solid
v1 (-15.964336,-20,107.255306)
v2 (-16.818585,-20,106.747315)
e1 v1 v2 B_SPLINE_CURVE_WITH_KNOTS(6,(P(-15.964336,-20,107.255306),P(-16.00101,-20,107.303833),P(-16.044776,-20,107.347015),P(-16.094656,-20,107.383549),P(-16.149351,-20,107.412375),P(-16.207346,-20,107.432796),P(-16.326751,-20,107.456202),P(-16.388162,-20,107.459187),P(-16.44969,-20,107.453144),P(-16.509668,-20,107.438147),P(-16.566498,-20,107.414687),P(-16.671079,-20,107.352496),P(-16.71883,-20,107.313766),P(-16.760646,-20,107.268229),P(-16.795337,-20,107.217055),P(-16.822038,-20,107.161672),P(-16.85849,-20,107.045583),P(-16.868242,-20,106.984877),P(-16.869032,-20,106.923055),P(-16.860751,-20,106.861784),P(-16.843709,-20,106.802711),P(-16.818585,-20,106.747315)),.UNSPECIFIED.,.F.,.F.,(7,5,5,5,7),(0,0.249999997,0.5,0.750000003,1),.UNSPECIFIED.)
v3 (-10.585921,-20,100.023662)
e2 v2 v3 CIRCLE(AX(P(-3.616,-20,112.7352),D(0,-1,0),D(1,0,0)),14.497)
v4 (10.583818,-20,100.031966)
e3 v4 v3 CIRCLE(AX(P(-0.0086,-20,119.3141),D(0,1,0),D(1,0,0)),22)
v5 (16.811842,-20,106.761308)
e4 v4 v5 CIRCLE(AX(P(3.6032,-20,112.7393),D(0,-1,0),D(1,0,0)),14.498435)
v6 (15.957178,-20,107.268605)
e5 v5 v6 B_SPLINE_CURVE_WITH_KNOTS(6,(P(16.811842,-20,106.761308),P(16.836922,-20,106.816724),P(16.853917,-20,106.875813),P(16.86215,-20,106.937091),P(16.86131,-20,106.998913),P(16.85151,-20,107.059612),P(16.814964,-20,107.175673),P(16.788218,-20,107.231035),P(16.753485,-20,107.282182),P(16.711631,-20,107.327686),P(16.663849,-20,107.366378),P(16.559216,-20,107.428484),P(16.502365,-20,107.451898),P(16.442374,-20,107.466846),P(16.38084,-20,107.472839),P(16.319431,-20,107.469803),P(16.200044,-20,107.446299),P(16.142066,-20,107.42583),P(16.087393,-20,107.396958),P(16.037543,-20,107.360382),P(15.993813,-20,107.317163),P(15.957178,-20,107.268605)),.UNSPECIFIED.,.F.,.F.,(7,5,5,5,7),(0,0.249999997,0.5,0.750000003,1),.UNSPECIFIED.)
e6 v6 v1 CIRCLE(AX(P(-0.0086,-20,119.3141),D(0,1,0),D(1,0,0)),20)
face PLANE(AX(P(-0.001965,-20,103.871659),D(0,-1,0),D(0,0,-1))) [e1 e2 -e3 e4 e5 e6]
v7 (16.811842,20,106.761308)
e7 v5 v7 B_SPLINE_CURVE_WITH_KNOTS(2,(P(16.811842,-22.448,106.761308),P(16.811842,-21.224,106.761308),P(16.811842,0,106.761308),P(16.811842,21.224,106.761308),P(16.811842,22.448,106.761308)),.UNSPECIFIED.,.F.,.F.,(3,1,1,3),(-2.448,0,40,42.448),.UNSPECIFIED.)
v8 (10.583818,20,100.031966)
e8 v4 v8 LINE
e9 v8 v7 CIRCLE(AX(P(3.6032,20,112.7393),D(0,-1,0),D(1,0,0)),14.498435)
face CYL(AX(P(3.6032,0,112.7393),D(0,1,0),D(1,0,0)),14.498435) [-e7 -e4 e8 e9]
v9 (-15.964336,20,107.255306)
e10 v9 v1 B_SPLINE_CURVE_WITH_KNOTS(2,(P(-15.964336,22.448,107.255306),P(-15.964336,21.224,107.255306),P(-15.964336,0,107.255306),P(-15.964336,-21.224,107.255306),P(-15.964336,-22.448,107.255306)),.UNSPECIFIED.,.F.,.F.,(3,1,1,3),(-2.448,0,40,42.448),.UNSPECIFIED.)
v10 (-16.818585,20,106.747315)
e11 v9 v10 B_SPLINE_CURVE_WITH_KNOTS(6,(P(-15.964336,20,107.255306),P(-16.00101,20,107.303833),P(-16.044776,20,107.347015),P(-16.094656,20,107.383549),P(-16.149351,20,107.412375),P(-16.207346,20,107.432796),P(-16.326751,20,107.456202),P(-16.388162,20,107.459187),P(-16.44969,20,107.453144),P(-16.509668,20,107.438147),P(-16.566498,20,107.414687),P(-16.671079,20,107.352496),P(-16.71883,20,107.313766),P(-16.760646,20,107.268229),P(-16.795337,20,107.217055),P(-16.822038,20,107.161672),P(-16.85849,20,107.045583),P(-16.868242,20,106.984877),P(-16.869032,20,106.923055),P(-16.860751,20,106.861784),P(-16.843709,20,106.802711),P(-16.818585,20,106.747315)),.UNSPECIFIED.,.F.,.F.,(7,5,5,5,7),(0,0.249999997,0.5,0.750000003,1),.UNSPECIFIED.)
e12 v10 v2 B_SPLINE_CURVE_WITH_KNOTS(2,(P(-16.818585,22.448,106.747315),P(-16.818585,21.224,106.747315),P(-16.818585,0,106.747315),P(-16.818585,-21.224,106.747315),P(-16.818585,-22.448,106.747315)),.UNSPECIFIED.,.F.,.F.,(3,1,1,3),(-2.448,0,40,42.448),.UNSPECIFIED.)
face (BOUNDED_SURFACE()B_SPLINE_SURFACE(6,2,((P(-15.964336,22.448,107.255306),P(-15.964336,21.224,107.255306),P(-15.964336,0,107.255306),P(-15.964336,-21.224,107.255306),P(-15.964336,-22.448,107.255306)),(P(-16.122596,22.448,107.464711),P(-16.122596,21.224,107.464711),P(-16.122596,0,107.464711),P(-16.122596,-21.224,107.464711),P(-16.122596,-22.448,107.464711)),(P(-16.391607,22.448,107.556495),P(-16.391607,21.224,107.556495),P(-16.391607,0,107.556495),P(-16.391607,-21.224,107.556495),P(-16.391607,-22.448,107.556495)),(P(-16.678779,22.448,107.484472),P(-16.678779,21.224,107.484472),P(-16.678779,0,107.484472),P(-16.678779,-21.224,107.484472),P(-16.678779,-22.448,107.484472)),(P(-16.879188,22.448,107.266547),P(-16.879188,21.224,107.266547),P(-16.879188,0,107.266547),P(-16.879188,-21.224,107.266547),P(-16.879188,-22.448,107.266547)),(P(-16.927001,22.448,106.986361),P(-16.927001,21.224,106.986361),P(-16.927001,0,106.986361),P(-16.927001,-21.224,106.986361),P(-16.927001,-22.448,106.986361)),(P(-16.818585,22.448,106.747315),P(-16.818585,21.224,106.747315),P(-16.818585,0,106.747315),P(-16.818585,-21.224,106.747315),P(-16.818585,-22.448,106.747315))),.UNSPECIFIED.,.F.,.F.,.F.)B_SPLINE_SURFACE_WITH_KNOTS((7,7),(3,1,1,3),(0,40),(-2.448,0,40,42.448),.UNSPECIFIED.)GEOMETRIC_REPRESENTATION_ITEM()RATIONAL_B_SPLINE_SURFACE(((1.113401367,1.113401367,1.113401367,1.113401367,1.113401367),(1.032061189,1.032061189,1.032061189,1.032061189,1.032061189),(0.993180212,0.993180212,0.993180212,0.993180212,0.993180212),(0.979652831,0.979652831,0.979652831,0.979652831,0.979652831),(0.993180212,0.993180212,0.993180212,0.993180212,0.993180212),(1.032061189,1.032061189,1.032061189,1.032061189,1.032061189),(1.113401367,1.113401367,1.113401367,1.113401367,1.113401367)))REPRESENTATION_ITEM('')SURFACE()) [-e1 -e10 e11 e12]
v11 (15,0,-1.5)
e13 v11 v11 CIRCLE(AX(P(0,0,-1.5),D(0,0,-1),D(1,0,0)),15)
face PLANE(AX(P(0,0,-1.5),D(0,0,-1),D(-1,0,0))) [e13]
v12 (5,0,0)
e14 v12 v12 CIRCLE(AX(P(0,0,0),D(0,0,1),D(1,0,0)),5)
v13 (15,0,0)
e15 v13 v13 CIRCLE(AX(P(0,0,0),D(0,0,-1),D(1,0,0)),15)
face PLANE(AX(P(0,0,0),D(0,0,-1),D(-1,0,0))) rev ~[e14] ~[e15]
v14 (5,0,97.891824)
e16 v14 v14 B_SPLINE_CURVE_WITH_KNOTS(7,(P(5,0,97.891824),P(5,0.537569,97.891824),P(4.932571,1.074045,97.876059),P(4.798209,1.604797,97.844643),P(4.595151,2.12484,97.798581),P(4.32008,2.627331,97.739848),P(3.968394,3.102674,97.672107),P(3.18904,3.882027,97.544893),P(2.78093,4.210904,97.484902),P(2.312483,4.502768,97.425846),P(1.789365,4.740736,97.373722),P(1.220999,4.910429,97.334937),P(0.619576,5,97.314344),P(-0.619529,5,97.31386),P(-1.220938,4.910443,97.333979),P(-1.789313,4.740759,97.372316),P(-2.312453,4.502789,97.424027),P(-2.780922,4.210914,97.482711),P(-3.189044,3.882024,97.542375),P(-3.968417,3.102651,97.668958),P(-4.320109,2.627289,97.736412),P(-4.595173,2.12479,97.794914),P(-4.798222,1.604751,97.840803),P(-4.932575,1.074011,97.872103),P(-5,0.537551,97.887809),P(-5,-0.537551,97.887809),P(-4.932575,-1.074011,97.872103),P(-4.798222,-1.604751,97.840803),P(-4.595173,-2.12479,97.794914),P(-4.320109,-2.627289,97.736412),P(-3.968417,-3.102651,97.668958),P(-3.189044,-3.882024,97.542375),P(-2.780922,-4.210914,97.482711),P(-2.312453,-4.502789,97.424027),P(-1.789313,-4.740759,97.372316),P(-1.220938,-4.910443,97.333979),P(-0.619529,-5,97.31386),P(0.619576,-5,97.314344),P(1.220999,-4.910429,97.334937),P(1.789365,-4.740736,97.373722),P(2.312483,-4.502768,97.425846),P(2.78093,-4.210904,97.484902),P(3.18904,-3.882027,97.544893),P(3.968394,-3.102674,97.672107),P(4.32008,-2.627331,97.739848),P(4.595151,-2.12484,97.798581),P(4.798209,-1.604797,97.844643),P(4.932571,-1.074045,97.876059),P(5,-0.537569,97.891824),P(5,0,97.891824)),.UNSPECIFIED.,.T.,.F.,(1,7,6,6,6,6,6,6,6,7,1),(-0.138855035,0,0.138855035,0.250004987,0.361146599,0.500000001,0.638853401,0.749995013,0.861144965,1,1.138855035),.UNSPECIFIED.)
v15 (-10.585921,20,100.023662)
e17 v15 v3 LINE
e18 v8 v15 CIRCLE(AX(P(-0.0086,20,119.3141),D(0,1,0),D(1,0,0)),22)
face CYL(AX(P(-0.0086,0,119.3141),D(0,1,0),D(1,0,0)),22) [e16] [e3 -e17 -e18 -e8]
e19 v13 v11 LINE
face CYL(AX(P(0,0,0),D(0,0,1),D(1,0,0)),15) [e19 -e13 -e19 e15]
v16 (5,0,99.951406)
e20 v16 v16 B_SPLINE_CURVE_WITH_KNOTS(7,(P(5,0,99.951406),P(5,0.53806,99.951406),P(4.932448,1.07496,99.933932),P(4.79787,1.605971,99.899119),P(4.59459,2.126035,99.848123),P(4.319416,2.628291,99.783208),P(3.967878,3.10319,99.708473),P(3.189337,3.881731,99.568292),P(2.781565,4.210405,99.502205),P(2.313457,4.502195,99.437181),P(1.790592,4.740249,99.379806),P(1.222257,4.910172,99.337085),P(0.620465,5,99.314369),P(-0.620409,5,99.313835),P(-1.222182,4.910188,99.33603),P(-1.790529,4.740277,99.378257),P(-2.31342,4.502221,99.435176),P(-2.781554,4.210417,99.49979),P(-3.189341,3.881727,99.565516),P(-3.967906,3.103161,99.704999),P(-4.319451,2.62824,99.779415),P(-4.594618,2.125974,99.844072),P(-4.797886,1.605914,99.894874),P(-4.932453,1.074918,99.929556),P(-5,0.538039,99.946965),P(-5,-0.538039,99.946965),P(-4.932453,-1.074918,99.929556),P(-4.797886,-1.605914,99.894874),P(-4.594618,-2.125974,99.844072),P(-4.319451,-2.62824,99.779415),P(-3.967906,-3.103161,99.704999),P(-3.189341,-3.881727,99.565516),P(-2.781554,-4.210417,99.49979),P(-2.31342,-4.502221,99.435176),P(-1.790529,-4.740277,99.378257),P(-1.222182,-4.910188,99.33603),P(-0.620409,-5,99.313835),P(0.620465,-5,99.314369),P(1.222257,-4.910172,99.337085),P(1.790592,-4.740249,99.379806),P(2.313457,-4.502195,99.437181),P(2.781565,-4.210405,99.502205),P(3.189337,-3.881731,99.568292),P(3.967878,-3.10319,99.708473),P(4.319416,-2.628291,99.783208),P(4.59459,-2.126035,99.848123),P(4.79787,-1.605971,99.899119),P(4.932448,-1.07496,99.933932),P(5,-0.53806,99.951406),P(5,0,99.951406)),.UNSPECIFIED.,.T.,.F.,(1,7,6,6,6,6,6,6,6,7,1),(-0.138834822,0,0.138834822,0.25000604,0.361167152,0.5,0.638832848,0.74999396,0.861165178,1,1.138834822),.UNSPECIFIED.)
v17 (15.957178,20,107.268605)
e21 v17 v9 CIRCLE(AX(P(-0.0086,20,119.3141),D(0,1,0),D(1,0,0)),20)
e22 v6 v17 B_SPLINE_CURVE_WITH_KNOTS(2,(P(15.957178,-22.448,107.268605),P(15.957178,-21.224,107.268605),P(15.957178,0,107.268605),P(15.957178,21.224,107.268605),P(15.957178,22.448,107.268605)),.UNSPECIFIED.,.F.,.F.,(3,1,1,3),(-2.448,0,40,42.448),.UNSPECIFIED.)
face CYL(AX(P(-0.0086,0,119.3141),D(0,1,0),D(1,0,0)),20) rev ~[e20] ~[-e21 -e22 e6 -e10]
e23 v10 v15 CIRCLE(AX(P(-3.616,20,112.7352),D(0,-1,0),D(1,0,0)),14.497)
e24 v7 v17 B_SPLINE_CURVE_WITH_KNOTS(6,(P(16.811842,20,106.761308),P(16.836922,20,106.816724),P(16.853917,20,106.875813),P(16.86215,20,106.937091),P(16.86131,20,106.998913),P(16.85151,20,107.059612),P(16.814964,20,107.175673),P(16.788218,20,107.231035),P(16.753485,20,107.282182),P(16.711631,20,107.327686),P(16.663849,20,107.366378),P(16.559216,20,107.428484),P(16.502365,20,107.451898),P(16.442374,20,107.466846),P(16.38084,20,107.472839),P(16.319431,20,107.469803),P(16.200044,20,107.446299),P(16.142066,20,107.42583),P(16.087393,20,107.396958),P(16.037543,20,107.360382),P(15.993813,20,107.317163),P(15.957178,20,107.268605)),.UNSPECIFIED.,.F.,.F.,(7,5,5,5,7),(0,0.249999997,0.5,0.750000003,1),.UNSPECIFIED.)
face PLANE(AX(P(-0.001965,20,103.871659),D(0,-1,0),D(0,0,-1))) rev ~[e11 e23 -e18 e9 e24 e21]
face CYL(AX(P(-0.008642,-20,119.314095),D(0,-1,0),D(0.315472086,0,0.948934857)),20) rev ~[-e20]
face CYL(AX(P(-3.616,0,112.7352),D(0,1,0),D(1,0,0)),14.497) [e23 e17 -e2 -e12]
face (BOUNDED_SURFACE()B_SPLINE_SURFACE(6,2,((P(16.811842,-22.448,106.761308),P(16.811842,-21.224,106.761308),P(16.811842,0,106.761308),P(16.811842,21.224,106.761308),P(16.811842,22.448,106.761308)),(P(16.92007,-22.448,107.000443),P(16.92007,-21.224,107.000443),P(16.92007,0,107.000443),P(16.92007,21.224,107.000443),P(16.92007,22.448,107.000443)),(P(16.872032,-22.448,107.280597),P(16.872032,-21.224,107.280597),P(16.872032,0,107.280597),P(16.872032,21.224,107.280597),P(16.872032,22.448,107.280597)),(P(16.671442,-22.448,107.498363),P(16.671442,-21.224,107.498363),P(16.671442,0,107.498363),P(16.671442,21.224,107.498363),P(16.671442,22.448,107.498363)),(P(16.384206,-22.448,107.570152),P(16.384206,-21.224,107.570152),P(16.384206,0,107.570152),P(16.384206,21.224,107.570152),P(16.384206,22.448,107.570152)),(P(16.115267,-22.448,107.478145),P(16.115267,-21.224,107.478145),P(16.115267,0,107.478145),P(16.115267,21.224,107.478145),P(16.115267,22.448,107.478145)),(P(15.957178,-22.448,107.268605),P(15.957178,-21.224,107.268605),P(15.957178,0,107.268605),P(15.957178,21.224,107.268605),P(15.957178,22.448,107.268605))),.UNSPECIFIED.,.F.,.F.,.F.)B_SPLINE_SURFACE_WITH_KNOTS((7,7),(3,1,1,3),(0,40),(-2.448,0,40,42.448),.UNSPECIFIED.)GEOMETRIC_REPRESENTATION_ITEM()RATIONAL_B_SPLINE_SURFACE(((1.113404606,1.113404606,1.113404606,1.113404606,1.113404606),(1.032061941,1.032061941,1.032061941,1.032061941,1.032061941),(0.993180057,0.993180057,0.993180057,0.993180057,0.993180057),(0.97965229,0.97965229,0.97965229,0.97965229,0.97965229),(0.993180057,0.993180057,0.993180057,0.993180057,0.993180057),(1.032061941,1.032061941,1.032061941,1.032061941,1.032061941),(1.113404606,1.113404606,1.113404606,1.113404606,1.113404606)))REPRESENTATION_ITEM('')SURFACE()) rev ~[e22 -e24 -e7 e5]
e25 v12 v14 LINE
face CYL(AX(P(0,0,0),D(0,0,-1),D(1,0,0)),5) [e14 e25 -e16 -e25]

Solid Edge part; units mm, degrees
sketch "Sketch1" plane through (0, 0, 0) normal (0, 0, 1) x (1, 0, 0)
  circle A0 centre (0, 0) radius 5
extrude "Protrusion1" add sketch "Sketch1" along normal blind 100
sketch "Sketch2" plane through (0, 0, 0) normal (0, 0, -1) x (1, 0, 0)
  circle A0 centre (0, 0) radius 15
extrude "ExtrudedProtrusion_2" add sketch "Sketch2" along normal blind 1.5
sketch "Sketch3" plane through (0, 0, 0) normal (0, -1, 0) x (1, 0, 0)
  arc A0 (18.9646, 112.9883) -> (-18.9764, 112.9719) centre (-0.0086, 119.3141) cw
  line L0 (-18.9764, 112.9719) -> (-17.3687, 108.1499)
  arc A1 (-17.3687, 108.1499) -> (-10.5859, 100.0237) centre (-3.616, 112.7352) ccw
  arc A2 (10.5838, 100.032) -> (-10.5859, 100.0237) centre (-0.0086, 119.3141) cw
  arc A3 (10.5838, 100.032) -> (17.3613, 108.1655) centre (3.6032, 112.7393) ccw
  line L1 (18.9646, 112.9883) -> (17.3613, 108.1655)
extrude "ExtrudedProtrusion_3" add sketch "Sketch3" along normal mid plane 40
sketch "Sketch4" plane through (-0.0059, -20, 105.1512) normal (0, -1, 0) x (0.3154721, 0, 0.9489349)
  arc A0 (13.4215, -15.5294) -> (1.4367, 20.469) centre (13.4388, 4.4706) cw
  line L0 (1.4367, 20.469) -> (5.9095, 22.7728)
  line L1 (5.9095, 22.7728) -> (18.5638, -15.5294)
  line L2 (18.5638, -15.5294) -> (13.4215, -15.5294)
extrude "ExtrudedCutout_1" cut sketch "Sketch4" against normal blind 62.9052
fillet "Round_1" radius 0.5 2 edges at (18.9646, 0, 112.9883) (-18.9764, 0, 112.9719)
